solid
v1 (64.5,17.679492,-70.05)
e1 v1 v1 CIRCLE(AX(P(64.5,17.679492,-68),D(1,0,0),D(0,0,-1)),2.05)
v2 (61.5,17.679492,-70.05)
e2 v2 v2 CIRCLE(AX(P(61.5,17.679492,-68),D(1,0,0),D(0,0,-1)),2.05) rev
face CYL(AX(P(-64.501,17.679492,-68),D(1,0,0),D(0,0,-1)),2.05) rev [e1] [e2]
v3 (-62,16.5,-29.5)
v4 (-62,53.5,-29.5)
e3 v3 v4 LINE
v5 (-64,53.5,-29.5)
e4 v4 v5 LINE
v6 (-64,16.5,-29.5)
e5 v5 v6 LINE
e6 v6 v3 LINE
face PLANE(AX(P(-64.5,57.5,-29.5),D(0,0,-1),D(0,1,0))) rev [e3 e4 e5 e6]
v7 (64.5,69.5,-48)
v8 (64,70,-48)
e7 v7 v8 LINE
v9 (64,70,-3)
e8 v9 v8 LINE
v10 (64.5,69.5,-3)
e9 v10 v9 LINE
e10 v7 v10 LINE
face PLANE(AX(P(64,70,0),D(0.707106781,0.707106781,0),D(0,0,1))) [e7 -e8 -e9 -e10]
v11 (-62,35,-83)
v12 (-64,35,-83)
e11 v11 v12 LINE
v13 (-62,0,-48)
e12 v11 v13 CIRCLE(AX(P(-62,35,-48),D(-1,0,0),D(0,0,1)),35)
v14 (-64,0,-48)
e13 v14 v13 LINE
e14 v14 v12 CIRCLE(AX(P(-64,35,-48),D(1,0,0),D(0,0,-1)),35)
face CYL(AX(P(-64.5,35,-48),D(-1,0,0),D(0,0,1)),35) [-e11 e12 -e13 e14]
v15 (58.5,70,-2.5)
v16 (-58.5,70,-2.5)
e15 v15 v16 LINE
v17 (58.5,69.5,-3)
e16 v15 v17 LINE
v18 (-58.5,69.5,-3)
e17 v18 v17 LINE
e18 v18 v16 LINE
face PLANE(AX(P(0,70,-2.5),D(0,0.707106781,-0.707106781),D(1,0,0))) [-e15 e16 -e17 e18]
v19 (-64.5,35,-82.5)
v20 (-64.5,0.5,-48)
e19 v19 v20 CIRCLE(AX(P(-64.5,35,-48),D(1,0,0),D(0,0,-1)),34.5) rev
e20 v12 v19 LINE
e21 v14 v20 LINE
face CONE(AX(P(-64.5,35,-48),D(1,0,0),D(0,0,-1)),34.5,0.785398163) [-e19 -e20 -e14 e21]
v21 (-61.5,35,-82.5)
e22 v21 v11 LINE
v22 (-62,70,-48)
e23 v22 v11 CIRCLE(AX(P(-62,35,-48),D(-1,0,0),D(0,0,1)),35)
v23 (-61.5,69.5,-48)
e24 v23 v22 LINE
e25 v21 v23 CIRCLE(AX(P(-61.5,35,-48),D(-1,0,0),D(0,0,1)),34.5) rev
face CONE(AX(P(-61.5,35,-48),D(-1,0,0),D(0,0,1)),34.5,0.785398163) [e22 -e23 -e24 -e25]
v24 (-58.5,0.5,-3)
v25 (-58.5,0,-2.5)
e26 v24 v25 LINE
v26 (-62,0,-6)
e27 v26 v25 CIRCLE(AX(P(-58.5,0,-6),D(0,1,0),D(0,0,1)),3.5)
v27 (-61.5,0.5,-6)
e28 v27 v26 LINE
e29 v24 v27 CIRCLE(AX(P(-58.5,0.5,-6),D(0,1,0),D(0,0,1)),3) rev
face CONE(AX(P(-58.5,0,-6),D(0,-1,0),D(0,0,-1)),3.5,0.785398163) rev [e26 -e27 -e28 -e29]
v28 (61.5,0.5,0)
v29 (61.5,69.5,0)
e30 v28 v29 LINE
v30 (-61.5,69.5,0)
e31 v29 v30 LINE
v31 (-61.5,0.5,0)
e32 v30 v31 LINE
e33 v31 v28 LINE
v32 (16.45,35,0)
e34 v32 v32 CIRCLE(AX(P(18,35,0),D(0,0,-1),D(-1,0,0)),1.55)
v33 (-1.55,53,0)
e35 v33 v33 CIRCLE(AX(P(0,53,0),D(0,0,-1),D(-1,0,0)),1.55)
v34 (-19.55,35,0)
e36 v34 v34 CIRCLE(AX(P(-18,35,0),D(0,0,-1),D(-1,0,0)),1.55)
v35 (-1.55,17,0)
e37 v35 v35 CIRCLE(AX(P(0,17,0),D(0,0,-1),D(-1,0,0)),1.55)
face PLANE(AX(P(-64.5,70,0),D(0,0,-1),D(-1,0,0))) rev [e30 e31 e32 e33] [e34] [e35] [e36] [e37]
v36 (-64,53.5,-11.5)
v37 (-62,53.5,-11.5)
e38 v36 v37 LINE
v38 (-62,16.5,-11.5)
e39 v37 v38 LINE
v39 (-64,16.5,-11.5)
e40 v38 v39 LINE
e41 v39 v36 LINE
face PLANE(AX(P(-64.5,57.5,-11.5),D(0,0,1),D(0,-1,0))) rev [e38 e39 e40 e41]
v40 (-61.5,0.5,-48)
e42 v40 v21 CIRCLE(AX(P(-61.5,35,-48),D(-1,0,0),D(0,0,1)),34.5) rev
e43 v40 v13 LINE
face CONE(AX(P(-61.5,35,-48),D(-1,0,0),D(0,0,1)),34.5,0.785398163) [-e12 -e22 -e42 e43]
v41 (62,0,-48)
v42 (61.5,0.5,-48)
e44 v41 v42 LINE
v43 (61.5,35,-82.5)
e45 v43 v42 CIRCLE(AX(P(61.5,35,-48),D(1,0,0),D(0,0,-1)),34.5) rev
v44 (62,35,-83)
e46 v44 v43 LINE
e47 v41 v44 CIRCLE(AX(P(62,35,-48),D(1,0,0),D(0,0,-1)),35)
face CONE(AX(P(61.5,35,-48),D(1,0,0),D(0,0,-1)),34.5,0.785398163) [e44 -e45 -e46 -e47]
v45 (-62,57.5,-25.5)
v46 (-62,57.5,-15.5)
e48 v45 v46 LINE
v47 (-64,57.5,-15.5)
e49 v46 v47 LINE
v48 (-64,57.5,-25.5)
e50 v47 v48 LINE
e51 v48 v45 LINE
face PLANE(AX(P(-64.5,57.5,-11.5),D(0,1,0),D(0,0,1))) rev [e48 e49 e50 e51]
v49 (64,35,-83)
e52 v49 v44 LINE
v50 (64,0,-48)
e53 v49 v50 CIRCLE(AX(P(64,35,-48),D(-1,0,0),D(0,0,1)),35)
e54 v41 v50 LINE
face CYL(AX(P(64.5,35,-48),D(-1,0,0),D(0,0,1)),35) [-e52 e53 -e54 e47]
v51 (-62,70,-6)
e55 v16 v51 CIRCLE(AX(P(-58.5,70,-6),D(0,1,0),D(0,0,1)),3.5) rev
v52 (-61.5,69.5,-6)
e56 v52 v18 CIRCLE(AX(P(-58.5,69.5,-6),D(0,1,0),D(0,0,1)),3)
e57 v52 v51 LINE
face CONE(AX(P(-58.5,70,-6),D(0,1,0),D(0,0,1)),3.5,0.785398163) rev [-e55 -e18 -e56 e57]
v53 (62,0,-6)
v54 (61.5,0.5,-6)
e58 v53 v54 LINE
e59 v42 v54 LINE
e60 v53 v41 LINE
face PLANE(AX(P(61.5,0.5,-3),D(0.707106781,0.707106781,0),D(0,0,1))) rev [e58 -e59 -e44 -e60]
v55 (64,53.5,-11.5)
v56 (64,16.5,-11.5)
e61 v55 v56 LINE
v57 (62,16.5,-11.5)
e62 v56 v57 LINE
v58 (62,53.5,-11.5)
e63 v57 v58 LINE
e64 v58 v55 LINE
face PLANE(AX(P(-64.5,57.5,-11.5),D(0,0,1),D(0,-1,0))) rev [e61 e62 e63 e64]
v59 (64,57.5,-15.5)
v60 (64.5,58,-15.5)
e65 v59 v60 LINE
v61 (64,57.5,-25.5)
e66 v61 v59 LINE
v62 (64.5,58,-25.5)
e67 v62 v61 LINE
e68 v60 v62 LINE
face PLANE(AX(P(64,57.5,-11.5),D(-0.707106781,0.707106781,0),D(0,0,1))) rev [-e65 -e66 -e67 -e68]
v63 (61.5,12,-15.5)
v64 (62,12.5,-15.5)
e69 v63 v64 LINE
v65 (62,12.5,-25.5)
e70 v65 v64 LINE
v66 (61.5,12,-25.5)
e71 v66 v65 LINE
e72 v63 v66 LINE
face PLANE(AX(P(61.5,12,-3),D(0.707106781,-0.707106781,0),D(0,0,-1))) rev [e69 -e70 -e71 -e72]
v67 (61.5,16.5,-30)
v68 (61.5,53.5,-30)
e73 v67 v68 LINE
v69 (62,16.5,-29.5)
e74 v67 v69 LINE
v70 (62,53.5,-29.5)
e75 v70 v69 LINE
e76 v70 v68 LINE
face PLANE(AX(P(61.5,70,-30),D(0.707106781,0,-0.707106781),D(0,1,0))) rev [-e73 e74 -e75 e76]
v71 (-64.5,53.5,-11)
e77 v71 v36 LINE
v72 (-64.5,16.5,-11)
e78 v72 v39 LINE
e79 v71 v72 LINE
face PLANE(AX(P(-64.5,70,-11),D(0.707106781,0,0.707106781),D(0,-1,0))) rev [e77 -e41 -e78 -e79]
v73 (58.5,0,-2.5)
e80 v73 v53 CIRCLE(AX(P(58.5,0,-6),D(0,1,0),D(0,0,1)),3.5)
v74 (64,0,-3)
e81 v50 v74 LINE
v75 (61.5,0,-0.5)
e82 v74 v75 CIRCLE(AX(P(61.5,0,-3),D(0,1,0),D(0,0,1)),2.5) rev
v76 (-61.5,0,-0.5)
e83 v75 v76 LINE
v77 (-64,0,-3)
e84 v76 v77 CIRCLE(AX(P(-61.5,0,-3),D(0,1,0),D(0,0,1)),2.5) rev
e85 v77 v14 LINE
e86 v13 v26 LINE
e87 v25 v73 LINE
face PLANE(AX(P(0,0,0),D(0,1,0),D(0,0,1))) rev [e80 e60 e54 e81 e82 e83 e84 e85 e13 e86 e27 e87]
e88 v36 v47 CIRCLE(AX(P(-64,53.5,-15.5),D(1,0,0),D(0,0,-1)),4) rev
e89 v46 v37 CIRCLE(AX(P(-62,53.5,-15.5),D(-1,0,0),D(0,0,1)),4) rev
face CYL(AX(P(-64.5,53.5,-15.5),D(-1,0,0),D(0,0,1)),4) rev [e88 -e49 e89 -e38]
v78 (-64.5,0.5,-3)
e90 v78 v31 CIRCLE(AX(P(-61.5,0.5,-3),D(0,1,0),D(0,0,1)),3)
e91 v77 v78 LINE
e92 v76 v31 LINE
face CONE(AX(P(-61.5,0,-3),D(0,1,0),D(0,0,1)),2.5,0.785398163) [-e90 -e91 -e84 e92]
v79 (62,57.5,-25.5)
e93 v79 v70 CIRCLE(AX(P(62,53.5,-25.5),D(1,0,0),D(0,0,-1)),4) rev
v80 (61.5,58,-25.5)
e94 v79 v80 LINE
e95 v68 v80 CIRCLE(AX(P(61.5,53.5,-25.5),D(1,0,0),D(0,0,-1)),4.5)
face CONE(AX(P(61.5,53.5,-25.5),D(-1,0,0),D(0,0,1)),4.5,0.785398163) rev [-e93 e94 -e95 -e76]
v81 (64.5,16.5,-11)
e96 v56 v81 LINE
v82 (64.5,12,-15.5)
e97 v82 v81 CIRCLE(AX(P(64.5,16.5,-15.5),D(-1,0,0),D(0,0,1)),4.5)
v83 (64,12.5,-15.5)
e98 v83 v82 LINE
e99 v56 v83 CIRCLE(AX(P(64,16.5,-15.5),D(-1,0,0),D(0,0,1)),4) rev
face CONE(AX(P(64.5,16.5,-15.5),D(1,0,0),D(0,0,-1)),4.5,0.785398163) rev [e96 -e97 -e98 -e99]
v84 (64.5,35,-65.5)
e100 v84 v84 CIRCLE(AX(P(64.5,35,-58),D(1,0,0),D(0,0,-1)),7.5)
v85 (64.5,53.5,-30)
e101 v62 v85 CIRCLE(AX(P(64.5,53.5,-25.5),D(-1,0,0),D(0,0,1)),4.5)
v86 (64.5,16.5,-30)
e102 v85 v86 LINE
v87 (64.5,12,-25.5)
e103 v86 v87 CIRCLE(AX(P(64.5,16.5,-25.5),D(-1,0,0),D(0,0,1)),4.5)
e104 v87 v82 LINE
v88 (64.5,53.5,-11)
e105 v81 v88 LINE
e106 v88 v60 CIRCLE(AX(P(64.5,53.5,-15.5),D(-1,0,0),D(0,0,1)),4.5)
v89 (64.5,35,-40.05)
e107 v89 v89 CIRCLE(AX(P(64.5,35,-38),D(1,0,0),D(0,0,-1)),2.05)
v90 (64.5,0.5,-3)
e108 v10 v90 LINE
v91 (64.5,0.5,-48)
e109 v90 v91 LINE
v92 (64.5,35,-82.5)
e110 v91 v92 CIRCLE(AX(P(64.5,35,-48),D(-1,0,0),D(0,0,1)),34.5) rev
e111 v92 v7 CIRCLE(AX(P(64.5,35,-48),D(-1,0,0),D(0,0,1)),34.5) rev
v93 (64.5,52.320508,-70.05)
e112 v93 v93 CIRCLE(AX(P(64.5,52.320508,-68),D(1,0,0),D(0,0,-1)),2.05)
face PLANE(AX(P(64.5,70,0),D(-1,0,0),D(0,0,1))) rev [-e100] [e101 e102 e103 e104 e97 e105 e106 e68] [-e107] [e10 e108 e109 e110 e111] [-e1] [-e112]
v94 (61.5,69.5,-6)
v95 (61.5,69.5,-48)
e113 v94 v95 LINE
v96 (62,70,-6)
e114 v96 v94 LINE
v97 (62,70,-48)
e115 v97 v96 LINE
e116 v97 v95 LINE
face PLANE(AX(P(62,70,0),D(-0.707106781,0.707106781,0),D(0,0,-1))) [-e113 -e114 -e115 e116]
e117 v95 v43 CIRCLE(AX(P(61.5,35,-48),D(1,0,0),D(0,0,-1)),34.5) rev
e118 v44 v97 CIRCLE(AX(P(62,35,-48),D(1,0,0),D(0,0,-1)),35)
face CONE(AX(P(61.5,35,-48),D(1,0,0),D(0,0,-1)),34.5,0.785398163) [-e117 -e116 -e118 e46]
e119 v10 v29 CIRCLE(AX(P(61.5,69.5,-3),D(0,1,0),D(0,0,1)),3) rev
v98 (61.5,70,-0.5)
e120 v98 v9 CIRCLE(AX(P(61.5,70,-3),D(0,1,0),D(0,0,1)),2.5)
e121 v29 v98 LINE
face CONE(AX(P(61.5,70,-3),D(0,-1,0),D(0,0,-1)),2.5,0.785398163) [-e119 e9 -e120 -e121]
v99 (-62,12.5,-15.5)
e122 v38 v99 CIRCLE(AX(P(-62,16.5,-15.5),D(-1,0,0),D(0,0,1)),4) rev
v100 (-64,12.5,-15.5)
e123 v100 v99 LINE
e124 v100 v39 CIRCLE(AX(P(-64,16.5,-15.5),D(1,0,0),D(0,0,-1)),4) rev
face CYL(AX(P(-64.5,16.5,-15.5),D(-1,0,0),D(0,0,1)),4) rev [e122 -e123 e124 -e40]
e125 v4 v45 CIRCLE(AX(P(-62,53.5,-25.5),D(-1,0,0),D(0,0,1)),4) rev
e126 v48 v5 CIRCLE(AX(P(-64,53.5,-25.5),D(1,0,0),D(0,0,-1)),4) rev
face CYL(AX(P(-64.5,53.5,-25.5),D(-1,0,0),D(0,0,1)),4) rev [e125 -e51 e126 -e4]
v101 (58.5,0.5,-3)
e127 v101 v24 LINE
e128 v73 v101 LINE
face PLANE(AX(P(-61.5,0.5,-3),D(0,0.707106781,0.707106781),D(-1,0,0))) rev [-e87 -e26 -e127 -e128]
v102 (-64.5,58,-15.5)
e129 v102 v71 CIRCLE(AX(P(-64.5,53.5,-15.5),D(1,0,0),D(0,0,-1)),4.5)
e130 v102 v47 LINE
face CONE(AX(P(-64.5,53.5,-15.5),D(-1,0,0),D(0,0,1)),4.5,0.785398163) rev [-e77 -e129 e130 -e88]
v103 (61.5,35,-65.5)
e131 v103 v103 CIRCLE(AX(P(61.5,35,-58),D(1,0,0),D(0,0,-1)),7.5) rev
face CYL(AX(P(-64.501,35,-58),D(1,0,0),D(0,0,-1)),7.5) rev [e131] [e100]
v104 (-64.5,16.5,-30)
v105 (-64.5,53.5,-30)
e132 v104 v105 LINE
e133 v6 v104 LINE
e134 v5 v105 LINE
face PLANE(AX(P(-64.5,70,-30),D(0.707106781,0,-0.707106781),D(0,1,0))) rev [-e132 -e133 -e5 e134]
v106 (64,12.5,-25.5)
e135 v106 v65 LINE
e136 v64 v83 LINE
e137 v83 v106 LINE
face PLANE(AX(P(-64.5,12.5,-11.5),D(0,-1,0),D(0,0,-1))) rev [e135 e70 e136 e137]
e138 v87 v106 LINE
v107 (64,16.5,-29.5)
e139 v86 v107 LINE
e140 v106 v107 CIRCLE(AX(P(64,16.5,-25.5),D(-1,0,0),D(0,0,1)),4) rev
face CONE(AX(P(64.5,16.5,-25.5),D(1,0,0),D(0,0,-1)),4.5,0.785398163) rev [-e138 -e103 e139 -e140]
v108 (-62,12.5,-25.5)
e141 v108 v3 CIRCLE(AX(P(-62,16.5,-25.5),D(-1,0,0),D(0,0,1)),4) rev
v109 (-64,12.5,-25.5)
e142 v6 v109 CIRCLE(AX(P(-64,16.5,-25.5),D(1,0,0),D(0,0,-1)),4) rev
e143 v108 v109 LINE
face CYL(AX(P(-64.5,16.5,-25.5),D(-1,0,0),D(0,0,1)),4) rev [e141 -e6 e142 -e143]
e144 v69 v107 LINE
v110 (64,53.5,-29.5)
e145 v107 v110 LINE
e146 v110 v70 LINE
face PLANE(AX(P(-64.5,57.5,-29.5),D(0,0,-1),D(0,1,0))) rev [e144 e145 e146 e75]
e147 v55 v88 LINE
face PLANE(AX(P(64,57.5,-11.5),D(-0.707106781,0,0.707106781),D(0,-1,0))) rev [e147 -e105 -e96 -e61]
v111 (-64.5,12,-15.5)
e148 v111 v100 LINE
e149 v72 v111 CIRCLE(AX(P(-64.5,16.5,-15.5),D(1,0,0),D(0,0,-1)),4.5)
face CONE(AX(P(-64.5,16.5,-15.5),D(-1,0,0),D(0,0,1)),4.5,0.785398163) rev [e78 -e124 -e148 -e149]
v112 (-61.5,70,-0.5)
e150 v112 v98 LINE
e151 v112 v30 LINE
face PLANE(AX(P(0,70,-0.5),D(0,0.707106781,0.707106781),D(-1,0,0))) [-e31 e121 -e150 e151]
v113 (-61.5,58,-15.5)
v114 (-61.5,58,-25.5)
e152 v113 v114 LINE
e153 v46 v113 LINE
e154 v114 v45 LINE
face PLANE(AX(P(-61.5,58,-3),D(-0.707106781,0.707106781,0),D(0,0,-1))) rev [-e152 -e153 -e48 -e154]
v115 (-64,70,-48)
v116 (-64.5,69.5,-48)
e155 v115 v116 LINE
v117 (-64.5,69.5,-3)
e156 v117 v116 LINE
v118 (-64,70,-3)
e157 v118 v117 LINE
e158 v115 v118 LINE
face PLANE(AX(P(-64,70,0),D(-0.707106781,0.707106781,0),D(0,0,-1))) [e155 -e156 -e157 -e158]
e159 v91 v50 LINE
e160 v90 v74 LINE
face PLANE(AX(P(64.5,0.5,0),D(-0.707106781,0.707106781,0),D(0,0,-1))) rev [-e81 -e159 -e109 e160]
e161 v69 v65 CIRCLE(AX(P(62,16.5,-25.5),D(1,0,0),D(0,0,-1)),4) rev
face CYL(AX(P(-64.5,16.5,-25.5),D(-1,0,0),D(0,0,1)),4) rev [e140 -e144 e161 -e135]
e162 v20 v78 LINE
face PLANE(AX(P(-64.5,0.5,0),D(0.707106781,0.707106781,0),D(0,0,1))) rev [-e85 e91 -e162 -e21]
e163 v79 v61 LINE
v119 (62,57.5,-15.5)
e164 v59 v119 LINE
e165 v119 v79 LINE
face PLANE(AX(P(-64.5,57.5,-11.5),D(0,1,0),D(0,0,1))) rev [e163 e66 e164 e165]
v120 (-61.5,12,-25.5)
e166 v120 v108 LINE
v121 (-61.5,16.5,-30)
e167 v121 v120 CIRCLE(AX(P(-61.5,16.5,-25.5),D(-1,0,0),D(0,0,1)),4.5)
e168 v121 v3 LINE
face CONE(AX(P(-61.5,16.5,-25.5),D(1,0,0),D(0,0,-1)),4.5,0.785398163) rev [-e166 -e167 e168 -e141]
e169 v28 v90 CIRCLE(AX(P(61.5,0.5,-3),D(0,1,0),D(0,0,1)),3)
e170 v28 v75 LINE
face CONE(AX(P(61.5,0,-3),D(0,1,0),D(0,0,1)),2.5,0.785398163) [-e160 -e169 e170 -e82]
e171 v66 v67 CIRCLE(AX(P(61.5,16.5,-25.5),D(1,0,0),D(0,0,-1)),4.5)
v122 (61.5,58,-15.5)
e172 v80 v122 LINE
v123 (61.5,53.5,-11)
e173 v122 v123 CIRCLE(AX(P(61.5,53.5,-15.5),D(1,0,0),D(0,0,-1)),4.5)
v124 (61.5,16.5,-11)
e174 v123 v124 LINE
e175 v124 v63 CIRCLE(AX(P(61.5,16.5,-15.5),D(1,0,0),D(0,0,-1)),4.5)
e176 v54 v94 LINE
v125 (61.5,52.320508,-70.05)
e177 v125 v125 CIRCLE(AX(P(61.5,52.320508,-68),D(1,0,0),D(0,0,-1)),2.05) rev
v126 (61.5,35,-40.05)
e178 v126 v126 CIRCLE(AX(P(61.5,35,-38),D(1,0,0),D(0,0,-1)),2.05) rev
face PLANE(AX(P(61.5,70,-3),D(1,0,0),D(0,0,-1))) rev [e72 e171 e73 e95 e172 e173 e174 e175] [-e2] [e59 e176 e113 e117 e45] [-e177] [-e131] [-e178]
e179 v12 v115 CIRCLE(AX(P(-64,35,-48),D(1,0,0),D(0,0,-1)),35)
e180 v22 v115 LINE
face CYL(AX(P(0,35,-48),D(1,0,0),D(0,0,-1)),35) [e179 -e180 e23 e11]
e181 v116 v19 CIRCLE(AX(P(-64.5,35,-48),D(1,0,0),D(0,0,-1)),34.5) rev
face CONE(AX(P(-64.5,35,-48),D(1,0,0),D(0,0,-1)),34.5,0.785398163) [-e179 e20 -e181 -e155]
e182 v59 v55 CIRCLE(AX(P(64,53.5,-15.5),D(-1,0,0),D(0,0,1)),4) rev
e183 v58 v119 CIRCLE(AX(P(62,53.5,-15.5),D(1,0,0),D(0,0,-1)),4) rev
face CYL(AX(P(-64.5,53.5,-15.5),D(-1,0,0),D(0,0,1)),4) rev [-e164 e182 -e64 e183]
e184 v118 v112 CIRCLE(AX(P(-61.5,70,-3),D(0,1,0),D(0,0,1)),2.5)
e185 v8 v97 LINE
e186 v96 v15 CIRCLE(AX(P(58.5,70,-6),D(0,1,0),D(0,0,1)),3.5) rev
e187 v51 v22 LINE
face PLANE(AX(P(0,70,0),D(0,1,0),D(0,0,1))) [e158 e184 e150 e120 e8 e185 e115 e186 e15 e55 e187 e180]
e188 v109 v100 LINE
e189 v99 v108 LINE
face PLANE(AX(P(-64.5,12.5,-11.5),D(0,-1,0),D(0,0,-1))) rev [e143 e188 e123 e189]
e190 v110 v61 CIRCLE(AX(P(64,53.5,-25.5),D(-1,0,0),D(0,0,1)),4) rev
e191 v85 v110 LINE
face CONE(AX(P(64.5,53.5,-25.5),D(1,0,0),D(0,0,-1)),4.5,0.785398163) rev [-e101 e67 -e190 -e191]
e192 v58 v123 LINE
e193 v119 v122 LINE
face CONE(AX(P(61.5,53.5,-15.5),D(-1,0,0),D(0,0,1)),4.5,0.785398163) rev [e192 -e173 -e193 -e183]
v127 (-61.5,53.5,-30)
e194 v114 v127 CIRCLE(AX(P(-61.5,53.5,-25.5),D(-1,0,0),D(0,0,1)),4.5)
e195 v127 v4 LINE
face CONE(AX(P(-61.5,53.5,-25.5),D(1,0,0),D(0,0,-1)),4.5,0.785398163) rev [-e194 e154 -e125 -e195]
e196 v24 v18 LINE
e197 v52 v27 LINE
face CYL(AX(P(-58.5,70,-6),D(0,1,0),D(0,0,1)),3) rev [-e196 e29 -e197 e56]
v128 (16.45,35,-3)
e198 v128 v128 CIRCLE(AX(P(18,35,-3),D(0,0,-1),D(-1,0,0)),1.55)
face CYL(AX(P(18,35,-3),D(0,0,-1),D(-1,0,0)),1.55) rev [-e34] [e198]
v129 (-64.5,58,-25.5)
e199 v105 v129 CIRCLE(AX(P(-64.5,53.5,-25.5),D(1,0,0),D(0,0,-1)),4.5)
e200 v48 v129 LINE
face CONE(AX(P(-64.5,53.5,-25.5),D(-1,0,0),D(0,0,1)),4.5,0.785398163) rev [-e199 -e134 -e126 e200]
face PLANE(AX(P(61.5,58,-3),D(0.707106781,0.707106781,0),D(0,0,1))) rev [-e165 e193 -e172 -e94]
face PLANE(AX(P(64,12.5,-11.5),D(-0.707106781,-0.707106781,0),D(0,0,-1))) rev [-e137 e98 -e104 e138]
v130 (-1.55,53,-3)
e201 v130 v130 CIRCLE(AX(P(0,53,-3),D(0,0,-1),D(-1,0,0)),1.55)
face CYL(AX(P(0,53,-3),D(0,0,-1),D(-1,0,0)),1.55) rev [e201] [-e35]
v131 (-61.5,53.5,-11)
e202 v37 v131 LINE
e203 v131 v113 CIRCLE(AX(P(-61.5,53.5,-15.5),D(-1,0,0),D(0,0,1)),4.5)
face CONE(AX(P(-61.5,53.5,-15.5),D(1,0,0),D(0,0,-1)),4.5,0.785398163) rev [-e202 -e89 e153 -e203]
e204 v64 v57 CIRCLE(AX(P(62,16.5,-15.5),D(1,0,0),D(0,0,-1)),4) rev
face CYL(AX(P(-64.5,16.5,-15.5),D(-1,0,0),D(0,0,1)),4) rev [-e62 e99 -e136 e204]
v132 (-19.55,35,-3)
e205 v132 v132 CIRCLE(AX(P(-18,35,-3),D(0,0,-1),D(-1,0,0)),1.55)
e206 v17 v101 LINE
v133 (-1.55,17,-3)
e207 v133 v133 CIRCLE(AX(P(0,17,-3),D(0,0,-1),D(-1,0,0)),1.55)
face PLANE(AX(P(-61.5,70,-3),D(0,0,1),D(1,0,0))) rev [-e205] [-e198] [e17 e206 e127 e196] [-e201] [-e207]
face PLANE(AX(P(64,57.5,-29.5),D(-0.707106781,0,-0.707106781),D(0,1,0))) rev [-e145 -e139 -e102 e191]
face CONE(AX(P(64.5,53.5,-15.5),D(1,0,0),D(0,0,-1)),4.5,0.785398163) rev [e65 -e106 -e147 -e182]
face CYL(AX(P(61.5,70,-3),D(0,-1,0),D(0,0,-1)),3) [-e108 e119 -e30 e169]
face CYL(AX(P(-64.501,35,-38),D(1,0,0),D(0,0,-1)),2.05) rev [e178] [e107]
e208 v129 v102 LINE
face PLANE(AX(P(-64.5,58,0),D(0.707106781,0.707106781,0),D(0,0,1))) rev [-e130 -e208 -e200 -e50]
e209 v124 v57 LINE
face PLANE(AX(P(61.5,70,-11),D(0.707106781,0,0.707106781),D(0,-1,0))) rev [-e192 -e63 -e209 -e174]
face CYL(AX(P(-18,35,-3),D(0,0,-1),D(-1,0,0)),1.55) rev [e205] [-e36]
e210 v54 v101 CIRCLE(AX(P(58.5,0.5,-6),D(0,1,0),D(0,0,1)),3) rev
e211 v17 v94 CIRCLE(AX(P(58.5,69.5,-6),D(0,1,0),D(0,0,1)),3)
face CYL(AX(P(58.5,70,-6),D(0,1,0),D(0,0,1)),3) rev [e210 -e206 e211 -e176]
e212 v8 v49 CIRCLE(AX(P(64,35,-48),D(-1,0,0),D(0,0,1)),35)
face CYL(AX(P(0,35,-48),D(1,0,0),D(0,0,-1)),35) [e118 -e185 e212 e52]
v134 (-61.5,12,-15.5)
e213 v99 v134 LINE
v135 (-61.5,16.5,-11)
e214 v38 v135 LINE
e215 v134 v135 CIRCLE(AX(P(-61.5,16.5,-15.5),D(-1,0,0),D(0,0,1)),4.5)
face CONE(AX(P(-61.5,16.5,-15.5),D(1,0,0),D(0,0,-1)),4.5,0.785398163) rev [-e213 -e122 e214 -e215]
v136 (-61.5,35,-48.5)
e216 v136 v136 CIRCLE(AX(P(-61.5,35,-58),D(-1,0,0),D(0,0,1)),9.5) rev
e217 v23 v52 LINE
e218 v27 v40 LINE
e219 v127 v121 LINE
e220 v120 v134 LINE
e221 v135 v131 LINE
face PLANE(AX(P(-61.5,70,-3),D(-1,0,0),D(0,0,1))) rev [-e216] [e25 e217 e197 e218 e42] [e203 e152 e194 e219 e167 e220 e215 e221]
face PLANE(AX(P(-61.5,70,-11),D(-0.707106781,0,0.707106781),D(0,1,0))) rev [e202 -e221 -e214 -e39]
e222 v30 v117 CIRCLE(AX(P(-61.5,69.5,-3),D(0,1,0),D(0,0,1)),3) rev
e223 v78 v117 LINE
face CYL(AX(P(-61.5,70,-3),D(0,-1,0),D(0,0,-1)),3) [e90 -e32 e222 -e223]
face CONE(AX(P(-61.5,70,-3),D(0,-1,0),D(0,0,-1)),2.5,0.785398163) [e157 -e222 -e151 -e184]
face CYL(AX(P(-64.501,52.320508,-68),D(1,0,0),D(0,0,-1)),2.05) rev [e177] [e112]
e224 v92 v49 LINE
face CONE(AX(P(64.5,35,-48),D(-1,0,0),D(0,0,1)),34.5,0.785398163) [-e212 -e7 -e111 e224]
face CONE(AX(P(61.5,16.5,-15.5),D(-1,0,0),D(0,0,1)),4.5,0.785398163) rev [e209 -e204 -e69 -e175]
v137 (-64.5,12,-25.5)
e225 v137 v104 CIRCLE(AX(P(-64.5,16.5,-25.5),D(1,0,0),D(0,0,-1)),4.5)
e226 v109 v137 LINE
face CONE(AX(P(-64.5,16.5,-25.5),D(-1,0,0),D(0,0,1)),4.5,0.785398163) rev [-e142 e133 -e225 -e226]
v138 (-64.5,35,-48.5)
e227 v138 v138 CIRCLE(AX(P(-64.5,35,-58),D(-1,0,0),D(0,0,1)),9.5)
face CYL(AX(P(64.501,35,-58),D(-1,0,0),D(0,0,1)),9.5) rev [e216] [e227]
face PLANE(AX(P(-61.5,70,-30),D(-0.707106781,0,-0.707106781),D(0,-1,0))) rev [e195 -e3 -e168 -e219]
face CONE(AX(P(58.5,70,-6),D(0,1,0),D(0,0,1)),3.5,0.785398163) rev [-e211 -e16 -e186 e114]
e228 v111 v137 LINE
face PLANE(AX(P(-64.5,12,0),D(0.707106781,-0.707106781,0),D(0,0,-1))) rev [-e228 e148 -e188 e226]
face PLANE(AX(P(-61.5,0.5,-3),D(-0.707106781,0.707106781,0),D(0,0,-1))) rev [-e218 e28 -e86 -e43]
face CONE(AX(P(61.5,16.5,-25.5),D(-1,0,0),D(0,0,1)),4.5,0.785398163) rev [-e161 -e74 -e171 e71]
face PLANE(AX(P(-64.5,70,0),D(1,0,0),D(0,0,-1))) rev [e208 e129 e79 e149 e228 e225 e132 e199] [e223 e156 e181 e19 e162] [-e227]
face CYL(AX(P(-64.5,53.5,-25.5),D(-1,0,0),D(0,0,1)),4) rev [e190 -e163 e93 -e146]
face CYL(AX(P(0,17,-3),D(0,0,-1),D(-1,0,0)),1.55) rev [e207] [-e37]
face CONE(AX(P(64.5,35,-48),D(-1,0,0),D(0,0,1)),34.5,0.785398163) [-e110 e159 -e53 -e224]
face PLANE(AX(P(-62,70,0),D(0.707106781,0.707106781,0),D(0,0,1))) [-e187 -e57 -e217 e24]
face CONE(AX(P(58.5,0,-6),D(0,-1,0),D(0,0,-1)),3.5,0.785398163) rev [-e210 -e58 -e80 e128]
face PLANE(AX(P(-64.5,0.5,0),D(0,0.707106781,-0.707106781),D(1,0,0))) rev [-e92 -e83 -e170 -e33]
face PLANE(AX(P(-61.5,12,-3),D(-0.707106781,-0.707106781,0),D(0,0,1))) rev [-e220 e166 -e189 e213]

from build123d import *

# Parameters (mm, degrees)
F_70MM_DEPTH            = 70
FILLET_1_R              = 3
CUT_EXTRUDE_1_REACH     = 170.612
SKETCH_2_R              = 2.05
SKETCH_2_R_2            = 7.5
CUT_EXTRUDE_2_REACH     = 170.612
SKETCH_3_R              = 9.5
SKETCH_4_W              = 18
SKETCH_4_H              = 45
CUT_EXTRUDE_3_DEPTH     = 169.611980594
FILLET_2_R              = 4
FILLET_3_R              = 35
HOLE_WIZARD_3_1_3_1_1_D = 3.1
CHAMFER_1_SIZE          = 0.5


with BuildPart() as part:
    # 草图1 → 宽70mm (new body)
    with BuildSketch(Plane(origin=(0, 0, 0), x_dir=(1, 0, 0), z_dir=(0, 1, 0))):
        Polygon((-64.5, 0), (64.5, 0), (64.5, 83), (61.5, 83), (61.5, 3), (-61.5, 3), (-61.5, 83), (-64.5, 83), align=None)
    extrude(amount=F_70MM_DEPTH)

    # 圆角1
    fillet_1_edges = [part.edges().sort_by_distance(p)[0] for p in [
        (64.5, 35, 0),
        (-64.5, 35, 0),
        (-61.5, 35, -3),
        (61.5, 35, -3),
    ]]
    fillet(fillet_1_edges, radius=FILLET_1_R)

    # 草图2 → 切除-拉伸1 (cut, up to next)
    with BuildSketch(Plane(origin=(64.5, 0, 0), x_dir=(0, 0, -1), z_dir=(1, 0, 0)), mode=Mode.PRIVATE) as cut_extrude_1_sk1:
        with Locations((38, 35)):
            Circle(SKETCH_2_R)
    cut_extrude_1_tool1 = extrude(cut_extrude_1_sk1.sketch, amount=-CUT_EXTRUDE_1_REACH, mode=Mode.PRIVATE) & part.part
    # 草图2 → 切除-拉伸1 (cut, up to next)
    with BuildSketch(Plane(origin=(64.5, 0, 0), x_dir=(0, 0, -1), z_dir=(1, 0, 0)), mode=Mode.PRIVATE) as cut_extrude_1_sk2:
        with Locations((68, 52.320508076)):
            Circle(SKETCH_2_R)
    cut_extrude_1_tool2 = extrude(cut_extrude_1_sk2.sketch, amount=-CUT_EXTRUDE_1_REACH, mode=Mode.PRIVATE) & part.part
    # 草图2 → 切除-拉伸1 (cut, up to next)
    with BuildSketch(Plane(origin=(64.5, 0, 0), x_dir=(0, 0, -1), z_dir=(1, 0, 0)), mode=Mode.PRIVATE) as cut_extrude_1_sk3:
        with Locations((68, 17.679491924)):
            Circle(SKETCH_2_R)
    cut_extrude_1_tool3 = extrude(cut_extrude_1_sk3.sketch, amount=-CUT_EXTRUDE_1_REACH, mode=Mode.PRIVATE) & part.part
    # 草图2 → 切除-拉伸1 (cut, up to next)
    with BuildSketch(Plane(origin=(64.5, 0, 0), x_dir=(0, 0, -1), z_dir=(1, 0, 0)), mode=Mode.PRIVATE) as cut_extrude_1_sk4:
        with Locations((58, 35)):
            Circle(SKETCH_2_R_2)
    cut_extrude_1_tool4 = extrude(cut_extrude_1_sk4.sketch, amount=-CUT_EXTRUDE_1_REACH, mode=Mode.PRIVATE) & part.part
    add(cut_extrude_1_tool1.solids().sort_by_distance((64.5, 35, -38))[0], mode=Mode.SUBTRACT)
    add(cut_extrude_1_tool2.solids().sort_by_distance((64.5, 52.320508, -68))[0], mode=Mode.SUBTRACT)
    add(cut_extrude_1_tool3.solids().sort_by_distance((64.5, 17.679492, -68))[0], mode=Mode.SUBTRACT)
    add(cut_extrude_1_tool4.solids().sort_by_distance((64.5, 35, -58))[0], mode=Mode.SUBTRACT)

    # 草图3 → 切除-拉伸2 (cut, up to next)
    with BuildSketch(Plane.ZY.offset(64.5), mode=Mode.PRIVATE) as cut_extrude_2_sk1:
        with Locations((-58, 35)):
            Circle(SKETCH_3_R)
    cut_extrude_2_tool1 = extrude(cut_extrude_2_sk1.sketch, amount=-CUT_EXTRUDE_2_REACH, mode=Mode.PRIVATE) & part.part
    add(cut_extrude_2_tool1.solids().sort_by_distance((-64.5, 35, -58))[0], mode=Mode.SUBTRACT)

    # 草图4 → 切除-拉伸3 (cut, through all)
    with BuildSketch(Plane(origin=(64.5, 0, 0), x_dir=(0, 0, -1), z_dir=(1, 0, 0))):
        with Locations((20.5, 35)):
            Rectangle(SKETCH_4_W, SKETCH_4_H)
    extrude(amount=-CUT_EXTRUDE_3_DEPTH, mode=Mode.SUBTRACT)

    # 圆角2
    fillet_2_edges = [part.edges().sort_by_distance(p)[0] for p in [
        (63, 57.5, -29.5),
        (-63, 57.5, -29.5),
        (63, 12.5, -29.5),
        (-63, 12.5, -29.5),
        (63, 12.5, -11.5),
        (-63, 12.5, -11.5),
        (63, 57.5, -11.5),
        (-63, 57.5, -11.5),
    ]]
    fillet(fillet_2_edges, radius=FILLET_2_R)

    # 圆角3
    fillet_3_edges = [part.edges().sort_by_distance(p)[0] for p in [
        (63, 70, -83),
        (-63, 70, -83),
        (-63, 0, -83),
        (63, 0, -83),
    ]]
    fillet(fillet_3_edges, radius=FILLET_3_R - 0.0001)  # a hair under: the kernel refuses the full size

    # Ø3.1 (3.1) 直径孔1 (through all)
    with Locations(Plane(origin=(0, 53, -3), x_dir=(-1, 0, 0), z_dir=(0, 0, -1))):
        with Locations((0, 0), (-18, -18), (0, -36), (18, -18)):
            Hole(HOLE_WIZARD_3_1_3_1_1_D / 2)

    # 倒角1
    chamfer_1_edges = [part.edges().sort_by_distance(p)[0] for p in [
        (-64.5, 35, -29.5),
        (-61.5, 35, -29.5),
        (-64.5, 35, -11.5),
        (-61.5, 35, -11.5),
        (-64.5, 12.5, -20.5),
        (-61.5, 12.5, -20.5),
        (64.5, 35, -29.5),
        (61.5, 35, -29.5),
        (64.5, 12.5, -20.5),
        (61.5, 12.5, -20.5),
        (64.5, 57.5, -20.5),
        (61.5, 57.5, -20.5),
        (64.5, 35, -11.5),
        (61.5, 35, -11.5),
        (-61.5, 56.328427125, -28.328427125),
        (-64.5, 56.328427125, -28.328427125),
        (-61.5, 56.328427125, -12.671572875),
        (-64.5, 56.328427125, -12.671572875),
        (-61.5, 13.671572875, -28.328427125),
        (-64.5, 13.671572875, -28.328427125),
        (-61.5, 13.671572875, -12.671572875),
        (-64.5, 13.671572875, -12.671572875),
        (64.5, 13.671572875, -28.328427125),
        (61.5, 13.671572875, -28.328427125),
        (64.5, 56.328427125, -28.328427125),
        (61.5, 56.328427125, -28.328427125),
        (64.5, 13.671572875, -12.671572875),
        (61.5, 13.671572875, -12.671572875),
        (64.5, 56.328427125, -12.671572875),
        (61.5, 56.328427125, -12.671572875),
        (61.5, 70, -27.00005),
        (-64.5, 70, -25.50005),
        (61.5, 0, -27.00005),
        (61.5, 10.251233369, -72.748766631),
        (61.5, 59.748766631, -72.748766631),
        (64.5, 10.251233369, -72.748766631),
        (64.5, 59.748766631, -72.748766631),
        (-64.5, 0, -25.50005),
        (-64.5, 10.251233369, -72.748766631),
        (-64.5, 59.748766631, -72.748766631),
        (-61.5, 10.251233369, -72.748766631),
        (-61.5, 59.748766631, -72.748766631),
        (64.5, 0, -25.50005),
        (64.5, 70, -25.50005),
        (0, 0, 0),
        (-61.5, 0, -27.00005),
        (0, 0, -3),
        (-63.621320344, 0, -0.878679656),
        (63.621320344, 0, -0.878679656),
        (0, 70, 0),
        (0, 70, -3),
        (-61.5, 70, -27.00005),
        (-63.621320344, 70, -0.878679656),
        (63.621320344, 70, -0.878679656),
        (-60.621320344, 0, -3.878679656),
        (-60.621320344, 70, -3.878679656),
        (60.621320344, 0, -3.878679656),
        (60.621320344, 70, -3.878679656),
        (-64.5, 57.5, -20.5),
        (-61.5, 57.5, -20.5),
    ]]
    chamfer(chamfer_1_edges, length=CHAMFER_1_SIZE)


solid = part.part
